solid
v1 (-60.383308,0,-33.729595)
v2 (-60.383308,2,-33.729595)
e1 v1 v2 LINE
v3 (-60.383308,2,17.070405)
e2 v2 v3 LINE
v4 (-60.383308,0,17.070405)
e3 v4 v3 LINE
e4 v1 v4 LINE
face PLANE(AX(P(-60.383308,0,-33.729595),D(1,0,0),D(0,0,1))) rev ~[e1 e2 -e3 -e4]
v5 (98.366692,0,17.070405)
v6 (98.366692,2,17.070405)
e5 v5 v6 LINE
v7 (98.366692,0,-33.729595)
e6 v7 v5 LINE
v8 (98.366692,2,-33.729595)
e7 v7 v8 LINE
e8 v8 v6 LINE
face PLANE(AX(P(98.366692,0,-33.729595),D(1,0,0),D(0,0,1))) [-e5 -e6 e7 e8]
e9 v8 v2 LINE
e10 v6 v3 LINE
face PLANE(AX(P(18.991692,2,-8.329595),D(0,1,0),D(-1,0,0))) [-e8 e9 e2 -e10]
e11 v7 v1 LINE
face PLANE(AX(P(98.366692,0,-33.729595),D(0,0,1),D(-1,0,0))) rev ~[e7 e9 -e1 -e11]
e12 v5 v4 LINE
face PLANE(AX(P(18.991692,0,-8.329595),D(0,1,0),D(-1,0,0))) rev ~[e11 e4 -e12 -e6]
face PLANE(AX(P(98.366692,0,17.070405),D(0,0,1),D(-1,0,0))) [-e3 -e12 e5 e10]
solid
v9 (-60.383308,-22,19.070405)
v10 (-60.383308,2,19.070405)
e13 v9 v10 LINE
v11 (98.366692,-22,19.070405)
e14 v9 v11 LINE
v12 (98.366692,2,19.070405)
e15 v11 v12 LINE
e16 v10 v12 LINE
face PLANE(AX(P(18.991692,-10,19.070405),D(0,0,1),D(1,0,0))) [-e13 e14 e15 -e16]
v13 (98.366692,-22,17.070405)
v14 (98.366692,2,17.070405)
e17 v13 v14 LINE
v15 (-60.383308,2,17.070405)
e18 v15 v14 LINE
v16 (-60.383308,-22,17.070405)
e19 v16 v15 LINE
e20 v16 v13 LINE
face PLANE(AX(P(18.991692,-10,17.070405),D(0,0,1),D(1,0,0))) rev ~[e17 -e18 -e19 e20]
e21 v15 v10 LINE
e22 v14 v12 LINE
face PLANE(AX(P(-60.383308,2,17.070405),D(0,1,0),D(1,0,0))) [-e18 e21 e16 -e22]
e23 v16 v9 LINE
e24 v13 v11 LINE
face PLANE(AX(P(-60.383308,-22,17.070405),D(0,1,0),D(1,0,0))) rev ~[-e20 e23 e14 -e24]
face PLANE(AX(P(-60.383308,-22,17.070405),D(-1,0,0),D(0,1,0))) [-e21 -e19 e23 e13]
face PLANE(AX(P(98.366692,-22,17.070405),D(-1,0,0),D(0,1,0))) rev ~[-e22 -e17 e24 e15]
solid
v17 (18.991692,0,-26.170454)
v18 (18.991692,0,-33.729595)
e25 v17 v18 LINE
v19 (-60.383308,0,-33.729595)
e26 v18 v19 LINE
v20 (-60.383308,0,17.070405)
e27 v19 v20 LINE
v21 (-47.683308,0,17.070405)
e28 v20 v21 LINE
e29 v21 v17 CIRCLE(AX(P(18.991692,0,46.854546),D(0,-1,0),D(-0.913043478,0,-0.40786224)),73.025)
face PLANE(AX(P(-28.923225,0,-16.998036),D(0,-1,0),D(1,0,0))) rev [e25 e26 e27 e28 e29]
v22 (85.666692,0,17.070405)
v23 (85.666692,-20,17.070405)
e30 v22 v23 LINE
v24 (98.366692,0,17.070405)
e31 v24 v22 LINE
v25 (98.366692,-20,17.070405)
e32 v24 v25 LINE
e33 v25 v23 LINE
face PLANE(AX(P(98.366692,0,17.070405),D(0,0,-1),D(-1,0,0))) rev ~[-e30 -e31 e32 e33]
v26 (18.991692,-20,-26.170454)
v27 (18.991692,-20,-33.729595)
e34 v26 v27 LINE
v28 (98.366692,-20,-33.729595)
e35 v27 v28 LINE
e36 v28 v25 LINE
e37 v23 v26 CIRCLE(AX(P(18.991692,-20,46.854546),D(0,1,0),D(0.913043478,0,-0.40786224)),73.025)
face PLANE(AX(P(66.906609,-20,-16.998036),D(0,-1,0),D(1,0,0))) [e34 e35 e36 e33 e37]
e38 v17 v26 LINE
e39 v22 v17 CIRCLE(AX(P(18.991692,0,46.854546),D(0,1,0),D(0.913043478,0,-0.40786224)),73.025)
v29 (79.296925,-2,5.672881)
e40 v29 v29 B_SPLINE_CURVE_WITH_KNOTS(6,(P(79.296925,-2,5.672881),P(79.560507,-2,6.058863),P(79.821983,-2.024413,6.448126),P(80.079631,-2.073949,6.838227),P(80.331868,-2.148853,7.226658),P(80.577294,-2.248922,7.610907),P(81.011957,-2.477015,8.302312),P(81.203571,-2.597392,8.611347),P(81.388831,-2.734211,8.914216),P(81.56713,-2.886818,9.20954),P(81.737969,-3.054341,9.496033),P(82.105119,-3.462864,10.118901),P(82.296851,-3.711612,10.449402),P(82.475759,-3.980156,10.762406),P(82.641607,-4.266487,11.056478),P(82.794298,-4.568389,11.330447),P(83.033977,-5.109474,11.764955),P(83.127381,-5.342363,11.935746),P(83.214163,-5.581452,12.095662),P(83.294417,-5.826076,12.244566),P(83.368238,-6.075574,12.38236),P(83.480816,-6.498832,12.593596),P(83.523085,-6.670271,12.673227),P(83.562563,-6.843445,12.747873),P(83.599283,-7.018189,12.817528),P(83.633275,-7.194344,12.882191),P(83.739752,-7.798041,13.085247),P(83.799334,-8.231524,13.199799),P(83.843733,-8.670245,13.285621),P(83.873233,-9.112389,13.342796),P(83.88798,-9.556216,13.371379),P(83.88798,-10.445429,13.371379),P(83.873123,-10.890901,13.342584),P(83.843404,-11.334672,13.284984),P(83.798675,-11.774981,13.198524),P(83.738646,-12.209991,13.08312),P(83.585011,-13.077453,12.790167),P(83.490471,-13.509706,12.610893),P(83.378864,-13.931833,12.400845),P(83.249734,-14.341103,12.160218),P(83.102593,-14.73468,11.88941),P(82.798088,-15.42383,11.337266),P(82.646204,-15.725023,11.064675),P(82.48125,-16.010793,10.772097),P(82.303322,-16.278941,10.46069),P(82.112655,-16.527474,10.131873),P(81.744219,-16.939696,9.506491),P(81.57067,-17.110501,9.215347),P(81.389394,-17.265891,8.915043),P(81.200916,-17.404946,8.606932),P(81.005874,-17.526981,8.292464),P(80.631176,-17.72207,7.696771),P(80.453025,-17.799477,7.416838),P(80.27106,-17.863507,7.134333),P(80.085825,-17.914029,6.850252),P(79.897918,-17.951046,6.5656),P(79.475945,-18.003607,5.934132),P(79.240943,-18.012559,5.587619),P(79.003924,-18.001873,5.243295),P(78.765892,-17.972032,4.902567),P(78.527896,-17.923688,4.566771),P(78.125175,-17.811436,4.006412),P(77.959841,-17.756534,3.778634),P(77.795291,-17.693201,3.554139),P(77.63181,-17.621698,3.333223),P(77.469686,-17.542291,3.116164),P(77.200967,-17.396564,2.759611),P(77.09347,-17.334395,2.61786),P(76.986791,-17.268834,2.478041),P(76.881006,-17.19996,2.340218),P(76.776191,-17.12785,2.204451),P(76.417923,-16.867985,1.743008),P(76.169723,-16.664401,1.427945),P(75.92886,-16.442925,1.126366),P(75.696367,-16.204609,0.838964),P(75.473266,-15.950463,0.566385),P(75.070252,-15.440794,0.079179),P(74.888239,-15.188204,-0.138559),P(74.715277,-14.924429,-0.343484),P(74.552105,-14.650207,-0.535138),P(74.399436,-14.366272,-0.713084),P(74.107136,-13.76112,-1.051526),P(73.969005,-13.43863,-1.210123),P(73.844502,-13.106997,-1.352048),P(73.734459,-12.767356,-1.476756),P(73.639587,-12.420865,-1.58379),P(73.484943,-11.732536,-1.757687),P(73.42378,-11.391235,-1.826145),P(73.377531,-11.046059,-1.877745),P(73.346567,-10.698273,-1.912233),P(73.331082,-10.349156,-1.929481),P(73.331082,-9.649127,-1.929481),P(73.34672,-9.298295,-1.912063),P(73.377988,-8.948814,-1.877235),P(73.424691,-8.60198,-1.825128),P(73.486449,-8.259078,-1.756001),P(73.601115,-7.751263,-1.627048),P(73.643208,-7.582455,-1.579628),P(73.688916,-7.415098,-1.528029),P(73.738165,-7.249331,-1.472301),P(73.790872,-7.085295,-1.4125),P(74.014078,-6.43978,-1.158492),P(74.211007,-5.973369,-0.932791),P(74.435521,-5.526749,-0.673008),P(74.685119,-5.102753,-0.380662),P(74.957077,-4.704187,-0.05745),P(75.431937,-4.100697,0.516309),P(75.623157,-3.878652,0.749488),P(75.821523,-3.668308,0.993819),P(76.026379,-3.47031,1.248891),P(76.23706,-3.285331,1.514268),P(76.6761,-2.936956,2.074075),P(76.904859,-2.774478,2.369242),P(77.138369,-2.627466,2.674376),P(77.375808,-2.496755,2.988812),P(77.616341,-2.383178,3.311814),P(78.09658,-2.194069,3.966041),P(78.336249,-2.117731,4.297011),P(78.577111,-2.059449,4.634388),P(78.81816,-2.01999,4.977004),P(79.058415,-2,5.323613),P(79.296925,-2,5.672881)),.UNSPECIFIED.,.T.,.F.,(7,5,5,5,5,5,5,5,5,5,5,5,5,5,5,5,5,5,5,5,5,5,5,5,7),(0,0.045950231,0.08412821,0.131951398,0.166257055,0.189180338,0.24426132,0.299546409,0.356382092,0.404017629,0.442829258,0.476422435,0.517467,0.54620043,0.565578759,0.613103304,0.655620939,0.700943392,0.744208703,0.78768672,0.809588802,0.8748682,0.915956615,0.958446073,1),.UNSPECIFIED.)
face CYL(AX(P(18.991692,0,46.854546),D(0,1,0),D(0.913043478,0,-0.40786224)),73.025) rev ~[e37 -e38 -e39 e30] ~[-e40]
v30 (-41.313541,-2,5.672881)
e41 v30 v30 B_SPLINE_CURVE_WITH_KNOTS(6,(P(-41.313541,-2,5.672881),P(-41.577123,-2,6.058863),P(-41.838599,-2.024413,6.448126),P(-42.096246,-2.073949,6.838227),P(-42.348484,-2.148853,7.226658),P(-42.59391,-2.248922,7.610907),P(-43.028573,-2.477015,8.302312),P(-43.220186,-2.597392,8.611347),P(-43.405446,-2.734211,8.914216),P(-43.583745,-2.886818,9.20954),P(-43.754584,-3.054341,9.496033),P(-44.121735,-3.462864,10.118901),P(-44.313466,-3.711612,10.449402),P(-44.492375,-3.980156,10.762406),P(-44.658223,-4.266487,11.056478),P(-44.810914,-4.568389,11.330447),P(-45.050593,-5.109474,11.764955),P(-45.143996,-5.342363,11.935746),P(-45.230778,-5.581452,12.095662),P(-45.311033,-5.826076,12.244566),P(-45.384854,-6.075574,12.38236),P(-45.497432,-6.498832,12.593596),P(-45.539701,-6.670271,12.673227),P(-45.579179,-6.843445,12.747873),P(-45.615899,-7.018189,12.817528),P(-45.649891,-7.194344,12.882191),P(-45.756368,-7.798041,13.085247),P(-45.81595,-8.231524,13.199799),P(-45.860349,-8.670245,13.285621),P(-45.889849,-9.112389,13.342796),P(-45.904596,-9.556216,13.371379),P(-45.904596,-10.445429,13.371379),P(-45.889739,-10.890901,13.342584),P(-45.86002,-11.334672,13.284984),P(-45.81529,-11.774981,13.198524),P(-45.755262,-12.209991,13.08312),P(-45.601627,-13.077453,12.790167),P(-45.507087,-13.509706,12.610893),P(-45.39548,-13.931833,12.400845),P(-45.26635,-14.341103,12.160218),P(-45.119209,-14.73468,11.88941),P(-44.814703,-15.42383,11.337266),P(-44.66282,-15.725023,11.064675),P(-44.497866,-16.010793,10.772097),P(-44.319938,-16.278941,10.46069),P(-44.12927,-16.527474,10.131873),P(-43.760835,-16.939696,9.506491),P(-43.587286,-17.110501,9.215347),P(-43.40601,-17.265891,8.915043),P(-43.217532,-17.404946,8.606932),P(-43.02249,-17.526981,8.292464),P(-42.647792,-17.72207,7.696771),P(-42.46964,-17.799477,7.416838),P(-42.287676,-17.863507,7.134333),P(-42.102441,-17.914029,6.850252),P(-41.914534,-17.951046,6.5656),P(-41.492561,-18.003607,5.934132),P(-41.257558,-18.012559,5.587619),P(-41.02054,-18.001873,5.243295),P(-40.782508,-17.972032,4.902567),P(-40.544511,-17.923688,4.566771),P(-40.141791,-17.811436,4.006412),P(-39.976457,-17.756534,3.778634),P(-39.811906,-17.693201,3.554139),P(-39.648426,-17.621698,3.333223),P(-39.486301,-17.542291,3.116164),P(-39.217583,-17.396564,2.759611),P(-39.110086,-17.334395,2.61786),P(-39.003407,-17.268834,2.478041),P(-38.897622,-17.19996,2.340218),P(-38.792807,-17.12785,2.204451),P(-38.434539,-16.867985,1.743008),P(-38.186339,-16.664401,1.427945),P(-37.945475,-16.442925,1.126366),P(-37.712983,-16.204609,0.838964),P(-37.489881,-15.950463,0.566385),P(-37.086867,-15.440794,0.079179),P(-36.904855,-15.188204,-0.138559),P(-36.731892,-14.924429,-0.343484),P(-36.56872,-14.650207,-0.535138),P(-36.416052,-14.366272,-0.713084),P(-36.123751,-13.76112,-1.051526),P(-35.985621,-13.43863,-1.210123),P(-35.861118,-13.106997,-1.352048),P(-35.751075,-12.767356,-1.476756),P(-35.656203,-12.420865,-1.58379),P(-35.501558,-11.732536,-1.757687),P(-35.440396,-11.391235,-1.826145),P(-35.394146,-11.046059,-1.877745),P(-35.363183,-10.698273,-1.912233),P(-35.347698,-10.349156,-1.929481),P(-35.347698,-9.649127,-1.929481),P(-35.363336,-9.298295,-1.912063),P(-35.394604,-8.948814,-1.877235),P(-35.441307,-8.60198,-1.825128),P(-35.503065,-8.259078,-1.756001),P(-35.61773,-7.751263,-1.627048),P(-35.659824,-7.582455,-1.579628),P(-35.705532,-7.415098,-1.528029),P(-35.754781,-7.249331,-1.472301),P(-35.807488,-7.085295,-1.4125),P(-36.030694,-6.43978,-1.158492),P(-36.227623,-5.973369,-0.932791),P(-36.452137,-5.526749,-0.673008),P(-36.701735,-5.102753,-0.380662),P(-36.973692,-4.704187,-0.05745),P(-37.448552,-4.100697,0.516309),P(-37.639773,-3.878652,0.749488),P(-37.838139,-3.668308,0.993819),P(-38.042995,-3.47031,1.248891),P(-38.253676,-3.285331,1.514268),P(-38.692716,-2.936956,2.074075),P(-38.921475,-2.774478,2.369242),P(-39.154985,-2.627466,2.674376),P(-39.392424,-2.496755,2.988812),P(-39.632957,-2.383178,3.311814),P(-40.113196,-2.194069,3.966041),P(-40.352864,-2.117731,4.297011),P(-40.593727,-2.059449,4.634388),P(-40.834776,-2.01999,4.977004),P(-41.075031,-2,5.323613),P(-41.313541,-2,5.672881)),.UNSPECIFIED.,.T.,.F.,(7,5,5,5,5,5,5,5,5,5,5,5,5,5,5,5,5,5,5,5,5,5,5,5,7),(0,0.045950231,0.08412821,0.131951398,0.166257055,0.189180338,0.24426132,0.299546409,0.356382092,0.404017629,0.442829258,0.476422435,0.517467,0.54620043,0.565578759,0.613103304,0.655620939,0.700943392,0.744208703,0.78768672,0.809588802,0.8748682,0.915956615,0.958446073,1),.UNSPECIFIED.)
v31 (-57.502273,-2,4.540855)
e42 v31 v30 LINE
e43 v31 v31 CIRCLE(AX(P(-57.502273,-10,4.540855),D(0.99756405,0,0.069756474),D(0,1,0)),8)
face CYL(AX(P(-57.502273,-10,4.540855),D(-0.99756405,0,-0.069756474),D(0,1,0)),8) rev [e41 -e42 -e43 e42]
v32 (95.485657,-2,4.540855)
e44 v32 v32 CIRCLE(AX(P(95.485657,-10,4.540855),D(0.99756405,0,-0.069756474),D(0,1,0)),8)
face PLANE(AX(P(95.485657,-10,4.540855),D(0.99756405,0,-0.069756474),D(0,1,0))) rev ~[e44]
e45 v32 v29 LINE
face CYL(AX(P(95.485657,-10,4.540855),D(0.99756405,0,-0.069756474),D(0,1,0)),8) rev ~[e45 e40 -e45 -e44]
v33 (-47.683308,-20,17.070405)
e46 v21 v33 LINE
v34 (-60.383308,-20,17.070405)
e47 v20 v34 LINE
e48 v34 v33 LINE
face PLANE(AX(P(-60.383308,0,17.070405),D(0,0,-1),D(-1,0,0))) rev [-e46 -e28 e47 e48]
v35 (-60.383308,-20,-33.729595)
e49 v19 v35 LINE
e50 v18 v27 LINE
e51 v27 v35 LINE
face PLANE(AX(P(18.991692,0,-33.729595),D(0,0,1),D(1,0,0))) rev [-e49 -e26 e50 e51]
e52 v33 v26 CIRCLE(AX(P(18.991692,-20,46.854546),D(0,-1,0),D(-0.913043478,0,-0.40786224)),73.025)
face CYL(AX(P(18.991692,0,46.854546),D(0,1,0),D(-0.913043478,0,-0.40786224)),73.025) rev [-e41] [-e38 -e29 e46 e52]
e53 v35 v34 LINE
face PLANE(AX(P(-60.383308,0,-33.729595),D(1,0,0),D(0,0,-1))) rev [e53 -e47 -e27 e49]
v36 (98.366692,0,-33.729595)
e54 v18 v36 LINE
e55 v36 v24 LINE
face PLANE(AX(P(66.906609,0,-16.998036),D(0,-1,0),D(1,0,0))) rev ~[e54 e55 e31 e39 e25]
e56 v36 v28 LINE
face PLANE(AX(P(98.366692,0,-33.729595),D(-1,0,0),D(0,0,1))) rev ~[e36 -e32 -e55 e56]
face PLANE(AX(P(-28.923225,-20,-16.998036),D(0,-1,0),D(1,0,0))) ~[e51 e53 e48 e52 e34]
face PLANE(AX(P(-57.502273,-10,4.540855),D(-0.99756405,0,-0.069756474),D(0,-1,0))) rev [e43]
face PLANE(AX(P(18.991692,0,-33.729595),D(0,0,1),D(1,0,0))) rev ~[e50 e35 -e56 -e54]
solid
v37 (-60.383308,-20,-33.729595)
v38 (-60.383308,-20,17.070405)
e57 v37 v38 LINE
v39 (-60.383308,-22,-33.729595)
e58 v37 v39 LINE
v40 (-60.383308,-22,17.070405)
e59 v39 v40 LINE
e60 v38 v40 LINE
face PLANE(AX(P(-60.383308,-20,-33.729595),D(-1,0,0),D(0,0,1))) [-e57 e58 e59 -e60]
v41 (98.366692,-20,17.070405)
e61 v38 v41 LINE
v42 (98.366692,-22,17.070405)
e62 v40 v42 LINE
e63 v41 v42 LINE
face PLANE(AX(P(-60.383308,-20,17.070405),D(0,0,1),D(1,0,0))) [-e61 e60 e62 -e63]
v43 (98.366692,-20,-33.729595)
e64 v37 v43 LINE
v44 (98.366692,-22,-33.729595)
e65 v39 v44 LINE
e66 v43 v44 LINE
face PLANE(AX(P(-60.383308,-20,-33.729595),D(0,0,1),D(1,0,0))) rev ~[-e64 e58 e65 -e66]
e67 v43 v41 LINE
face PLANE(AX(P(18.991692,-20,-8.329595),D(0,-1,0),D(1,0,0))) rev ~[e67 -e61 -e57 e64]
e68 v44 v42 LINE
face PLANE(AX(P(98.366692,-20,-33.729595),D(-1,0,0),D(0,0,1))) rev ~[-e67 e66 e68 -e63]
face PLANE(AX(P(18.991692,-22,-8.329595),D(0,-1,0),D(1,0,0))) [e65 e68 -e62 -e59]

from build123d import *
from build123d import SkipClean  # not in build123d's __all__

# Parameters (mm, degrees)
F1_DEPTH  = 20
F5_R      = 8
F6_DEPTH  = 21.6502592253
F8_W      = 158.75
F8_H      = 50.8
F9_DEPTH  = 2
F10_W     = 158.75
F10_H     = 50.8
F11_DEPTH = 2
F12_W     = 158.75
F12_H     = 24
F13_DEPTH = 2


# Not quite as in the source:
# - a feature names something its author has since deleted; it is built from what else it names


with BuildPart() as f1:
    # F0 (on Front) → F1 (new body)
    with BuildSketch(Plane.XZ):
        with BuildLine():
            Line((18.991692129, -26.1704544329), (18.991692129, -33.7295945078))
            Line((18.991692129, -33.7295945078), (98.366692129, -33.7295945078))
            Line((98.366692129, -33.7295945078), (98.366692129, 17.0704054922))
            Line((98.366692129, 17.0704054922), (85.666692129, 17.0704054922))
            ThreePointArc((85.666692129, 17.0704054922), (58.7262098437, -14.413869844), (18.991692129, -26.1704544329))
        make_face()
    extrude(amount=F1_DEPTH)

    # F5 (on face) → F6 (cut, through all)
    with BuildSketch(Plane(origin=(94.705044452, 0, -6.6224218335), x_dir=(0, 1, 0), z_dir=(0.9975640503, 0, -0.0697564737))):
        with Locations((-10, 11.1905364192)):
            Circle(F5_R)
    extrude(amount=-F6_DEPTH, mode=Mode.SUBTRACT)

    # F7: F1 across face


with BuildPart() as f1_1:
    add(f1.part, clean=False)
    with SkipClean():  # cleaning this boolean's faces spoils the solid; the shape is the same uncleaned
        add(f1.part.mirror(Plane(origin=(18.991692129, -10, -29.9500244704), x_dir=(0, -1, 0), z_dir=(-1, 0, 0))), clean=False)


with BuildPart() as f9:
    # F8 (on face) → F9 (new body)
    with BuildSketch(Plane(origin=(0, 0, 0), x_dir=(-1, 0, 0), z_dir=(0, 1, 0))):
        with Locations((-18.991692129, -8.3295945078)):
            Rectangle(F8_W, F8_H)
    extrude(amount=F9_DEPTH)


with BuildPart() as f11:
    # F10 (on face) → F11 (new body)
    with BuildSketch(Plane.XZ.offset(20)):
        with Locations((18.991692129, -8.3295945078)):
            Rectangle(F10_W, F10_H)
    extrude(amount=F11_DEPTH)


with BuildPart() as f13:
    # F12 (on face) → F13 (new body)
    with BuildSketch(Plane.XY.offset(17.0704054922)):
        with Locations((18.991692129, -10)):
            Rectangle(F12_W, F12_H)
    extrude(amount=F13_DEPTH)


solid = Compound([f1_1.part, f9.part, f11.part, f13.part])
